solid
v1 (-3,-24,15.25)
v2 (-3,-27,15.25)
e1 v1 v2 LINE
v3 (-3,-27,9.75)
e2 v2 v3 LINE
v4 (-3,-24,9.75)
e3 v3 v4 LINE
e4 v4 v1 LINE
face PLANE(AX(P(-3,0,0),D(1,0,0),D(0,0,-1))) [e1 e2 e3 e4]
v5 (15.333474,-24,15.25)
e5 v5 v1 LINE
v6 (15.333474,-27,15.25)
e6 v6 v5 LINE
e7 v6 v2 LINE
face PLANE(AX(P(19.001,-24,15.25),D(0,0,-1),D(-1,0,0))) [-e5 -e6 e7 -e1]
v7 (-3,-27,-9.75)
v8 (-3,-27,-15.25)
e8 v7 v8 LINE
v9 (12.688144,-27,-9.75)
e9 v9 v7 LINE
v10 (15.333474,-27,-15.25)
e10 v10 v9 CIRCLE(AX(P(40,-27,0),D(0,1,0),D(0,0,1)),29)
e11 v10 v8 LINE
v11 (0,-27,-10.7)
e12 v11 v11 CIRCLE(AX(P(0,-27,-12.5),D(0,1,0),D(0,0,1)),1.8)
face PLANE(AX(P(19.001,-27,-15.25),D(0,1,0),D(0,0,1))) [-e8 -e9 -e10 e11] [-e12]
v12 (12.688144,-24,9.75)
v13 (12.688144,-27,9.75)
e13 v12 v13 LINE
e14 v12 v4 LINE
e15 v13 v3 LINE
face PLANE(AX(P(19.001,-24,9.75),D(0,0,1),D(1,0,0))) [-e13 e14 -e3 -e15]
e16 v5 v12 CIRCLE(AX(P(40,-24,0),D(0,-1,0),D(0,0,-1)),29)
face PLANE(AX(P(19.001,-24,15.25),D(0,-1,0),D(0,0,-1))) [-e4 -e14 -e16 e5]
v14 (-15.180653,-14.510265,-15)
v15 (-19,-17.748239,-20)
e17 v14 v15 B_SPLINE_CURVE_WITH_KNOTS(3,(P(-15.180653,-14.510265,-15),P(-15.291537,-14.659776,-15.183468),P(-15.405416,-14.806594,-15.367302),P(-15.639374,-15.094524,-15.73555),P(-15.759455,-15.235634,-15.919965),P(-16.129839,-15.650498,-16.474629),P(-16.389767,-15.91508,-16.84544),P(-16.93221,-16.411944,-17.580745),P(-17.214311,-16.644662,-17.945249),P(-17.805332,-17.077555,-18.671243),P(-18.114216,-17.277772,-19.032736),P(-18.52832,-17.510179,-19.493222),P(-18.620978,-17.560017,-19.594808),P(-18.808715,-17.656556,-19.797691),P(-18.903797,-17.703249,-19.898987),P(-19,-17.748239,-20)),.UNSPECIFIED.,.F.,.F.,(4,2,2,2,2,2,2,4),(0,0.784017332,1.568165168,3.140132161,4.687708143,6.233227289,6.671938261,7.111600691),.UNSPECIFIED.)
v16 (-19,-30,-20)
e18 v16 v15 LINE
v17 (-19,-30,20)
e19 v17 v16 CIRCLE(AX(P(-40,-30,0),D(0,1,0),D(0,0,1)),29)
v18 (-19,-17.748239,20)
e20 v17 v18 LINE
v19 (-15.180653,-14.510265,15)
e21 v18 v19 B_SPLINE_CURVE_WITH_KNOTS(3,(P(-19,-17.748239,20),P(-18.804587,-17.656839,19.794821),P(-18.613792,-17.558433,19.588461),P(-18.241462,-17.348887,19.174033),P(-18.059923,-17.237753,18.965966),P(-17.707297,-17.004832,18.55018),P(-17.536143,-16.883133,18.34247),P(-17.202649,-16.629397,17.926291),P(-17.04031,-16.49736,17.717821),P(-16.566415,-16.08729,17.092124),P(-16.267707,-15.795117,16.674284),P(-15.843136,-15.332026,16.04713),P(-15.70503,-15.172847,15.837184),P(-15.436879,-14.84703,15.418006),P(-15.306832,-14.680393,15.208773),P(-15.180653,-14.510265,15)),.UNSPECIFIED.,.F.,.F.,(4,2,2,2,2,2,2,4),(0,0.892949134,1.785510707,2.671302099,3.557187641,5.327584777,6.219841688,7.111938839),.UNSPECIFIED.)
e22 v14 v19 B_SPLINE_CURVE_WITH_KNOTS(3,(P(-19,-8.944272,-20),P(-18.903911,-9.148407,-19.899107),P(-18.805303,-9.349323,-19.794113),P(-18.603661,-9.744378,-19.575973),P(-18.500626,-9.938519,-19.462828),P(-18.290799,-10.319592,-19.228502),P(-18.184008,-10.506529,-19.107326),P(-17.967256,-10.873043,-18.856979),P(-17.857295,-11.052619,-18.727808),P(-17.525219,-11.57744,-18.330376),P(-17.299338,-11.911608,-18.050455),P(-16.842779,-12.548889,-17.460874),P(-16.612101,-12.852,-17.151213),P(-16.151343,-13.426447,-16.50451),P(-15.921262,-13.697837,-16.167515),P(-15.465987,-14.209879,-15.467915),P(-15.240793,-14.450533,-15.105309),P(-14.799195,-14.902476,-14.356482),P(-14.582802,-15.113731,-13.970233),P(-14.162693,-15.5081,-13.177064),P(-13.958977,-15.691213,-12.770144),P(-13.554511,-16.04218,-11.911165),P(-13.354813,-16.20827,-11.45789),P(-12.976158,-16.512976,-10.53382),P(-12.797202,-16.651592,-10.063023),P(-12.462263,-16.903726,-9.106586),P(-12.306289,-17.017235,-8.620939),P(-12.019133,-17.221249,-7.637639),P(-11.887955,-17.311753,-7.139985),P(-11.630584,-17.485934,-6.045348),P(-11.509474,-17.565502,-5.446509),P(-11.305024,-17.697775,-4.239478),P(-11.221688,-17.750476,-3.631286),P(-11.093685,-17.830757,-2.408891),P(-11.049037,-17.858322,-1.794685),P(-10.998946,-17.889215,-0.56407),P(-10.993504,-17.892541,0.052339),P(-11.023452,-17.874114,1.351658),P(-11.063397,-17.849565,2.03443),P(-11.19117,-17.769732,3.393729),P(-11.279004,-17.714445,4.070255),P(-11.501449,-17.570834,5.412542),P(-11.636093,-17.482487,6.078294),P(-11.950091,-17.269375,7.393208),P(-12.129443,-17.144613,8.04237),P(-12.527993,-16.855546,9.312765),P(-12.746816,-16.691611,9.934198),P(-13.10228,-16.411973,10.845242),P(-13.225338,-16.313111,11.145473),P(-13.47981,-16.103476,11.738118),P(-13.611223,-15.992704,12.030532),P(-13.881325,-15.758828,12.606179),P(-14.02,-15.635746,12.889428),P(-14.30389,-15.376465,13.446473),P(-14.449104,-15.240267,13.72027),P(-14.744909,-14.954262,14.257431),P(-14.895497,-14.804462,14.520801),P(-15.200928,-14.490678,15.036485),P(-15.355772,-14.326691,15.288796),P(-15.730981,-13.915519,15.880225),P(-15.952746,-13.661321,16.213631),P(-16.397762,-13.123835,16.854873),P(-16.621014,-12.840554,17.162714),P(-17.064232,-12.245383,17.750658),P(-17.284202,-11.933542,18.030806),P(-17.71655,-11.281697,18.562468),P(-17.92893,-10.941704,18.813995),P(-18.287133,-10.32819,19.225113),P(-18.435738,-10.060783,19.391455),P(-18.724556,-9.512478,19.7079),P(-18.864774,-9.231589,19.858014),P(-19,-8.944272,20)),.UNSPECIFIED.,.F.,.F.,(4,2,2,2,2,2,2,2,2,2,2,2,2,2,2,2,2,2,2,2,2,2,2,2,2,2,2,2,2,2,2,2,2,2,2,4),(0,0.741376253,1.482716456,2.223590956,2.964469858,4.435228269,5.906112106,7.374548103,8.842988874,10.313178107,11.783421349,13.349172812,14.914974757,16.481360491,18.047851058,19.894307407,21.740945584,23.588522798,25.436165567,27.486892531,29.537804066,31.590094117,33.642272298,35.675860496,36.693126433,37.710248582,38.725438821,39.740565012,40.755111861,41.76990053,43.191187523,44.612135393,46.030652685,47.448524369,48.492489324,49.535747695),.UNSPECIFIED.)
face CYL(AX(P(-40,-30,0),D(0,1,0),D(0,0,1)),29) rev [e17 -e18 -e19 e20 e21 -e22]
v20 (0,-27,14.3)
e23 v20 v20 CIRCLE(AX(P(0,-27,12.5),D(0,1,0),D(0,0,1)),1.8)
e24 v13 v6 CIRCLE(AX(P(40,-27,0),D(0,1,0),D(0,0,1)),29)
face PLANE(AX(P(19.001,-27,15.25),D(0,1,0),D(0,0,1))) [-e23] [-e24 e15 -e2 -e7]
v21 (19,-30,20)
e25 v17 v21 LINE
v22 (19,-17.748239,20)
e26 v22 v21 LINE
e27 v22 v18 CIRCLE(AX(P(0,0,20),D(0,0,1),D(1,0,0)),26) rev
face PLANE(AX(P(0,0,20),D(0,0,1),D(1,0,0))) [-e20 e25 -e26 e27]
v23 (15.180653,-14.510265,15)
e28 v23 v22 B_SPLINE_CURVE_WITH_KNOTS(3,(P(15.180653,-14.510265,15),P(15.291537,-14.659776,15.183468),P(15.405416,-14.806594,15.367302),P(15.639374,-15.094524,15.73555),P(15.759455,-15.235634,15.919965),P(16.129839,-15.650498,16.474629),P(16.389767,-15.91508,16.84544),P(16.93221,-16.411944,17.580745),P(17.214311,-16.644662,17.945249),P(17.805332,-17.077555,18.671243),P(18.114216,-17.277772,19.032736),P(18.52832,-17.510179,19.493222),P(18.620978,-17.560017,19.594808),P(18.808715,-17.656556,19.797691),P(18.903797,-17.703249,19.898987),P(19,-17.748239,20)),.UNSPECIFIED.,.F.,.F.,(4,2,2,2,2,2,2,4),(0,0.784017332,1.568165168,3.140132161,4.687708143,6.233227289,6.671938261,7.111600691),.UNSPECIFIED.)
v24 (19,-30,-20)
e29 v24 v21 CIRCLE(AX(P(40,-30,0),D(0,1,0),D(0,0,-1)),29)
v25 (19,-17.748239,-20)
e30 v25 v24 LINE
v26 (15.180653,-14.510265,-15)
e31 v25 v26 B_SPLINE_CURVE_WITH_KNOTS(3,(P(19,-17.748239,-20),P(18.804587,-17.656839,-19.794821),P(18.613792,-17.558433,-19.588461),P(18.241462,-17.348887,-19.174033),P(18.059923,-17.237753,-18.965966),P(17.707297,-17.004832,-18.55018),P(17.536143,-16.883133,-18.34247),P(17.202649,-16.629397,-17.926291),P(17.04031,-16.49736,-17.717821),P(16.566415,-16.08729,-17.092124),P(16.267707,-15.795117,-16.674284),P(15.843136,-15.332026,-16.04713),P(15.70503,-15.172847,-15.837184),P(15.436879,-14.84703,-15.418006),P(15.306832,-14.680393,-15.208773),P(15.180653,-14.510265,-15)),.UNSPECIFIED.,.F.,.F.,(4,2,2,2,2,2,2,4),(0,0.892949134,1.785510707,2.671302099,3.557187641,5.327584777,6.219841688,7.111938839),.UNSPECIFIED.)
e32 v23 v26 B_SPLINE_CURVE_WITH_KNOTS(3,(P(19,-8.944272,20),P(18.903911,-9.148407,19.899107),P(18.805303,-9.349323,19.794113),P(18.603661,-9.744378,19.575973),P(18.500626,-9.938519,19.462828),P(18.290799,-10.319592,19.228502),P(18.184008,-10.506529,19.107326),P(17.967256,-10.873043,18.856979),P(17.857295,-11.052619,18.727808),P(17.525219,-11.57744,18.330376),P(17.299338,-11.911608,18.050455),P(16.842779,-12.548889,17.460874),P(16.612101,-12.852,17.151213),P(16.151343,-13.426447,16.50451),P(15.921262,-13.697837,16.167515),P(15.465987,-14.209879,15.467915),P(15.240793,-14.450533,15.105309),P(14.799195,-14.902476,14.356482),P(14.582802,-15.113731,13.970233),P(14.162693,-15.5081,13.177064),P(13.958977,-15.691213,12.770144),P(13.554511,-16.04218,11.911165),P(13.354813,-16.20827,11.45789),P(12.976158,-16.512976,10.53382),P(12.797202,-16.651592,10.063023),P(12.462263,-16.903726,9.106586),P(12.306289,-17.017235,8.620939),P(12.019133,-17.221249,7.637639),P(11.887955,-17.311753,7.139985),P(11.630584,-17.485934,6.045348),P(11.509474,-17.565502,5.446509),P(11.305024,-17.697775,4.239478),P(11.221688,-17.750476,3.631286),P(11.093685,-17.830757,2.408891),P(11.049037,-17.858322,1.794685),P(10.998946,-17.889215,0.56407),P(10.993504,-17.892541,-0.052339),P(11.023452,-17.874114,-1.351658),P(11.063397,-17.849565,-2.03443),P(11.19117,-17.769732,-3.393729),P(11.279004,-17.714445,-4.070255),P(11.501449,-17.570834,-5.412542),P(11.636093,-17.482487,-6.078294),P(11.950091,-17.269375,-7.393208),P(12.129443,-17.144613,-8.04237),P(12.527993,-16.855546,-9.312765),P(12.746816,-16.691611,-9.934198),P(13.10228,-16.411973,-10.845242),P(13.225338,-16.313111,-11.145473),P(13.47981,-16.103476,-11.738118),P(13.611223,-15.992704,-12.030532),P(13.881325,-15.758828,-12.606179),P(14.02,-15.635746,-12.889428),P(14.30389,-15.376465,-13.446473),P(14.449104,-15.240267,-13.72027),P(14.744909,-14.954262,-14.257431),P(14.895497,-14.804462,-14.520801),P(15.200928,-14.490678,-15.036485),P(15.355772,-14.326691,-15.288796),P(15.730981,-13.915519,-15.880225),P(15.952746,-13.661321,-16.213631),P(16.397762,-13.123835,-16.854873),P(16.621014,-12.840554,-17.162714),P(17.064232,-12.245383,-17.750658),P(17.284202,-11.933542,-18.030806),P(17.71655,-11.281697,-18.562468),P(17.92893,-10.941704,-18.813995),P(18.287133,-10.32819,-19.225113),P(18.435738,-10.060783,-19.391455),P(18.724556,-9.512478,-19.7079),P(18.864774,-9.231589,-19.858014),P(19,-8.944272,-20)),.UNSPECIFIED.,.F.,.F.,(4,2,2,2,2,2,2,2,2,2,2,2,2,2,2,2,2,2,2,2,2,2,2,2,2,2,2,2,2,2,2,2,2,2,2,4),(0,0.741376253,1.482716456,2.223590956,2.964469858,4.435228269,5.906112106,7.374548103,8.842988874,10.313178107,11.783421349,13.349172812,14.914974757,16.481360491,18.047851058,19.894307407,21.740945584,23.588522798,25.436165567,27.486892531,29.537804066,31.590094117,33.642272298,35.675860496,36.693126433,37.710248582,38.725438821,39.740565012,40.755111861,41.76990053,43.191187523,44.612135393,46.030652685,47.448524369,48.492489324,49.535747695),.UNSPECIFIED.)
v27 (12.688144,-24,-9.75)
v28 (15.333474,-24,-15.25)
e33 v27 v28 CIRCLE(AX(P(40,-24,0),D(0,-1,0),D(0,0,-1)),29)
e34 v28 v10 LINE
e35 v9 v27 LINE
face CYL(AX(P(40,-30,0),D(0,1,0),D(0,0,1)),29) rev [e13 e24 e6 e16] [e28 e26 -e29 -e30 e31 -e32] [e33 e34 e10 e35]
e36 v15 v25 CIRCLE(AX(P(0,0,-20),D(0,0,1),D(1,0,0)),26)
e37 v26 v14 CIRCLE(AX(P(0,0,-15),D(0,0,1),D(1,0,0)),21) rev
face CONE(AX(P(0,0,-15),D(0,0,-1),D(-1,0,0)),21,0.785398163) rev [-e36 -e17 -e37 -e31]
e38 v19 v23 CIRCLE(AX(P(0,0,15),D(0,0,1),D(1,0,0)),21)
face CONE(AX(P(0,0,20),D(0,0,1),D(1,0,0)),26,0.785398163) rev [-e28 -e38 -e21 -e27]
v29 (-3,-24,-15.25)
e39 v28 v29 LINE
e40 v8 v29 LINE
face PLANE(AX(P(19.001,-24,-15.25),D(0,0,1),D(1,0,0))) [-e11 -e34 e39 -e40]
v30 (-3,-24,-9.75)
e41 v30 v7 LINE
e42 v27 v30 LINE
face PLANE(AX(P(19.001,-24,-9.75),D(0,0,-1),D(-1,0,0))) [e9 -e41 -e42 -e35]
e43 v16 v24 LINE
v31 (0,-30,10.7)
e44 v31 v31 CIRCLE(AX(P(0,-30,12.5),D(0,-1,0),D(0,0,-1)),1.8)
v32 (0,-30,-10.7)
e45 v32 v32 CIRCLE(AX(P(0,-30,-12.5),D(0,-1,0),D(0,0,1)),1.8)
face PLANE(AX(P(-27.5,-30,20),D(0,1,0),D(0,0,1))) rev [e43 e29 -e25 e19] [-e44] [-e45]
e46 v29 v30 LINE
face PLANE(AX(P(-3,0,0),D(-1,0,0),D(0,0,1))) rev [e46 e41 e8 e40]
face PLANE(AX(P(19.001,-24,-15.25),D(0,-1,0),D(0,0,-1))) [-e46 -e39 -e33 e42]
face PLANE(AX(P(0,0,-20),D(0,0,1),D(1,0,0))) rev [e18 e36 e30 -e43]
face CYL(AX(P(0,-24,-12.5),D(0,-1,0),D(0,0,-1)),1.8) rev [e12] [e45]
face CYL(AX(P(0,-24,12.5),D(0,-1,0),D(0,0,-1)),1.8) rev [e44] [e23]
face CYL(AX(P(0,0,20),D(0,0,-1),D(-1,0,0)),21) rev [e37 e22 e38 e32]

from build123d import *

# Parameters (mm, degrees)
BOSS_EXTRUDE1_DEPTH                 = 20
SKETCH4_R                           = 29
CUT_EXTRUDE1_DEPTH                  = 46.345892868
CHAMFER1_SIZE                       = 5
SKETCH5_W                           = 5.5
SKETCH5_H                           = 3
CUT_EXTRUDE2_DEPTH                  = 3
CUT_EXTRUDE2_DIRECTION_2_REACH      = 42.755
CUT_EXTRUDE2_DIRECTION_2_END_RADIUS = 29
SKETCH7_R                           = 1.8
CUT_EXTRUDE3_DEPTH                  = 6


with BuildPart() as part:
    # Sketch3 → Boss-Extrude1 (new, symmetric)
    with BuildSketch(Plane.XY):
        with BuildLine():
            Line((-27.5, -30), (27.5, -30))
            Line((27.5, -30), (27.5, 0))
            Line((27.5, 0), (21, 0))
            ThreePointArc((21, 0), (0, -21), (-21, 0))
            Line((-21, 0), (-27.5, 0))
            Line((-27.5, 0), (-27.5, -30))
        make_face()
    extrude(amount=BOSS_EXTRUDE1_DEPTH, both=True)

    # Sketch4 → Cut-Extrude1 (cut, through all)
    with BuildSketch(Plane(origin=(0, 0, 0), x_dir=(1, 0, 0), z_dir=(0, 1, 0))):
        with Locations((-40, 0)):
            Circle(SKETCH4_R)
        with Locations((40, 0)):
            Circle(SKETCH4_R)
    extrude(amount=-CUT_EXTRUDE1_DEPTH, mode=Mode.SUBTRACT)

    # Chamfer1
    # the kernel refuses this chamfer: 5 mm, written as the material it takes off along each edge
    with BuildSketch(Plane(origin=(0, 0, 20), x_dir=(0.9851003883005318, 0.1719803040180515, 0), z_dir=(-0.1719803040180515, 0.9851003883005318, 0))) as chamfer1_piece_1:
        Polygon((21 + CHAMFER1_SIZE, 0), (21, CHAMFER1_SIZE), (21, 0), align=None)
    revolve(axis=Axis((0, 0, 20), (0, 0, -1)), revolution_arc=199.805956235, mode=Mode.SUBTRACT)
    with BuildSketch(Plane(origin=(0, 0, -20), x_dir=(0.9851003883005321, 0.1719803040180491, 0), z_dir=(-0.1719803040180491, 0.9851003883005321, 0))) as chamfer1_piece_2:
        Polygon((21 + CHAMFER1_SIZE, 0), (21, -CHAMFER1_SIZE), (21, 0), align=None)
    revolve(axis=Axis((0, 0, -20), (0, 0, -1)), revolution_arc=199.805956235, mode=Mode.SUBTRACT)

    # Sketch5 → Cut-Extrude2 (cut)
    with BuildSketch(Plane(origin=(0, 0, 0), x_dir=(0, 0, -1), z_dir=(1, 0, 0))):
        with Locations((-12.5, -25.5)):
            Rectangle(SKETCH5_W, SKETCH5_H)
        with Locations((12.5, -25.5)):
            Rectangle(SKETCH5_W, SKETCH5_H)
    extrude(amount=-CUT_EXTRUDE2_DEPTH, mode=Mode.SUBTRACT)

    # Cut-Extrude2 direction 2: up to this cylinder (the profile starts outside it)
    cut_extrude2_direction_2_end = Plane(origin=(40, -25.5, 0), z_dir=(0, 1, 0)) * Cylinder(CUT_EXTRUDE2_DIRECTION_2_END_RADIUS, 144.51, mode=Mode.PRIVATE)
    # Sketch5 → Cut-Extrude2 direction 2 (cut, up to the surface)
    with BuildSketch(Plane(origin=(0, 0, 0), x_dir=(0, 0, -1), z_dir=(1, 0, 0)), mode=Mode.PRIVATE) as cut_extrude2_direction_2_sk1:
        with Locations((-12.5, -25.5)):
            Rectangle(SKETCH5_W, SKETCH5_H)
    cut_extrude2_direction_2_tool1 = extrude(cut_extrude2_direction_2_sk1.sketch, amount=CUT_EXTRUDE2_DIRECTION_2_REACH, mode=Mode.PRIVATE) - cut_extrude2_direction_2_end
    add(cut_extrude2_direction_2_tool1.solids().sort_by_distance((0, -25.5, 12.5))[0], mode=Mode.SUBTRACT)
    # Sketch5 → Cut-Extrude2 direction 2 (cut, up to the surface)
    with BuildSketch(Plane(origin=(0, 0, 0), x_dir=(0, 0, -1), z_dir=(1, 0, 0)), mode=Mode.PRIVATE) as cut_extrude2_direction_2_sk2:
        with Locations((12.5, -25.5)):
            Rectangle(SKETCH5_W, SKETCH5_H)
    cut_extrude2_direction_2_tool2 = extrude(cut_extrude2_direction_2_sk2.sketch, amount=CUT_EXTRUDE2_DIRECTION_2_REACH, mode=Mode.PRIVATE) - cut_extrude2_direction_2_end
    add(cut_extrude2_direction_2_tool2.solids().sort_by_distance((0, -25.5, -12.5))[0], mode=Mode.SUBTRACT)

    # Sketch7 → Cut-Extrude3 (cut)
    with BuildSketch(Plane.XZ.offset(30)):
        with Locations(Location((0, 12.5, 0), (0, 0, 270))):
            Circle(SKETCH7_R)
        with Locations(Location((0, -12.5, 0), (0, 0, 90))):
            Circle(SKETCH7_R)
    extrude(amount=-CUT_EXTRUDE3_DEPTH, mode=Mode.SUBTRACT)


solid = part.part
